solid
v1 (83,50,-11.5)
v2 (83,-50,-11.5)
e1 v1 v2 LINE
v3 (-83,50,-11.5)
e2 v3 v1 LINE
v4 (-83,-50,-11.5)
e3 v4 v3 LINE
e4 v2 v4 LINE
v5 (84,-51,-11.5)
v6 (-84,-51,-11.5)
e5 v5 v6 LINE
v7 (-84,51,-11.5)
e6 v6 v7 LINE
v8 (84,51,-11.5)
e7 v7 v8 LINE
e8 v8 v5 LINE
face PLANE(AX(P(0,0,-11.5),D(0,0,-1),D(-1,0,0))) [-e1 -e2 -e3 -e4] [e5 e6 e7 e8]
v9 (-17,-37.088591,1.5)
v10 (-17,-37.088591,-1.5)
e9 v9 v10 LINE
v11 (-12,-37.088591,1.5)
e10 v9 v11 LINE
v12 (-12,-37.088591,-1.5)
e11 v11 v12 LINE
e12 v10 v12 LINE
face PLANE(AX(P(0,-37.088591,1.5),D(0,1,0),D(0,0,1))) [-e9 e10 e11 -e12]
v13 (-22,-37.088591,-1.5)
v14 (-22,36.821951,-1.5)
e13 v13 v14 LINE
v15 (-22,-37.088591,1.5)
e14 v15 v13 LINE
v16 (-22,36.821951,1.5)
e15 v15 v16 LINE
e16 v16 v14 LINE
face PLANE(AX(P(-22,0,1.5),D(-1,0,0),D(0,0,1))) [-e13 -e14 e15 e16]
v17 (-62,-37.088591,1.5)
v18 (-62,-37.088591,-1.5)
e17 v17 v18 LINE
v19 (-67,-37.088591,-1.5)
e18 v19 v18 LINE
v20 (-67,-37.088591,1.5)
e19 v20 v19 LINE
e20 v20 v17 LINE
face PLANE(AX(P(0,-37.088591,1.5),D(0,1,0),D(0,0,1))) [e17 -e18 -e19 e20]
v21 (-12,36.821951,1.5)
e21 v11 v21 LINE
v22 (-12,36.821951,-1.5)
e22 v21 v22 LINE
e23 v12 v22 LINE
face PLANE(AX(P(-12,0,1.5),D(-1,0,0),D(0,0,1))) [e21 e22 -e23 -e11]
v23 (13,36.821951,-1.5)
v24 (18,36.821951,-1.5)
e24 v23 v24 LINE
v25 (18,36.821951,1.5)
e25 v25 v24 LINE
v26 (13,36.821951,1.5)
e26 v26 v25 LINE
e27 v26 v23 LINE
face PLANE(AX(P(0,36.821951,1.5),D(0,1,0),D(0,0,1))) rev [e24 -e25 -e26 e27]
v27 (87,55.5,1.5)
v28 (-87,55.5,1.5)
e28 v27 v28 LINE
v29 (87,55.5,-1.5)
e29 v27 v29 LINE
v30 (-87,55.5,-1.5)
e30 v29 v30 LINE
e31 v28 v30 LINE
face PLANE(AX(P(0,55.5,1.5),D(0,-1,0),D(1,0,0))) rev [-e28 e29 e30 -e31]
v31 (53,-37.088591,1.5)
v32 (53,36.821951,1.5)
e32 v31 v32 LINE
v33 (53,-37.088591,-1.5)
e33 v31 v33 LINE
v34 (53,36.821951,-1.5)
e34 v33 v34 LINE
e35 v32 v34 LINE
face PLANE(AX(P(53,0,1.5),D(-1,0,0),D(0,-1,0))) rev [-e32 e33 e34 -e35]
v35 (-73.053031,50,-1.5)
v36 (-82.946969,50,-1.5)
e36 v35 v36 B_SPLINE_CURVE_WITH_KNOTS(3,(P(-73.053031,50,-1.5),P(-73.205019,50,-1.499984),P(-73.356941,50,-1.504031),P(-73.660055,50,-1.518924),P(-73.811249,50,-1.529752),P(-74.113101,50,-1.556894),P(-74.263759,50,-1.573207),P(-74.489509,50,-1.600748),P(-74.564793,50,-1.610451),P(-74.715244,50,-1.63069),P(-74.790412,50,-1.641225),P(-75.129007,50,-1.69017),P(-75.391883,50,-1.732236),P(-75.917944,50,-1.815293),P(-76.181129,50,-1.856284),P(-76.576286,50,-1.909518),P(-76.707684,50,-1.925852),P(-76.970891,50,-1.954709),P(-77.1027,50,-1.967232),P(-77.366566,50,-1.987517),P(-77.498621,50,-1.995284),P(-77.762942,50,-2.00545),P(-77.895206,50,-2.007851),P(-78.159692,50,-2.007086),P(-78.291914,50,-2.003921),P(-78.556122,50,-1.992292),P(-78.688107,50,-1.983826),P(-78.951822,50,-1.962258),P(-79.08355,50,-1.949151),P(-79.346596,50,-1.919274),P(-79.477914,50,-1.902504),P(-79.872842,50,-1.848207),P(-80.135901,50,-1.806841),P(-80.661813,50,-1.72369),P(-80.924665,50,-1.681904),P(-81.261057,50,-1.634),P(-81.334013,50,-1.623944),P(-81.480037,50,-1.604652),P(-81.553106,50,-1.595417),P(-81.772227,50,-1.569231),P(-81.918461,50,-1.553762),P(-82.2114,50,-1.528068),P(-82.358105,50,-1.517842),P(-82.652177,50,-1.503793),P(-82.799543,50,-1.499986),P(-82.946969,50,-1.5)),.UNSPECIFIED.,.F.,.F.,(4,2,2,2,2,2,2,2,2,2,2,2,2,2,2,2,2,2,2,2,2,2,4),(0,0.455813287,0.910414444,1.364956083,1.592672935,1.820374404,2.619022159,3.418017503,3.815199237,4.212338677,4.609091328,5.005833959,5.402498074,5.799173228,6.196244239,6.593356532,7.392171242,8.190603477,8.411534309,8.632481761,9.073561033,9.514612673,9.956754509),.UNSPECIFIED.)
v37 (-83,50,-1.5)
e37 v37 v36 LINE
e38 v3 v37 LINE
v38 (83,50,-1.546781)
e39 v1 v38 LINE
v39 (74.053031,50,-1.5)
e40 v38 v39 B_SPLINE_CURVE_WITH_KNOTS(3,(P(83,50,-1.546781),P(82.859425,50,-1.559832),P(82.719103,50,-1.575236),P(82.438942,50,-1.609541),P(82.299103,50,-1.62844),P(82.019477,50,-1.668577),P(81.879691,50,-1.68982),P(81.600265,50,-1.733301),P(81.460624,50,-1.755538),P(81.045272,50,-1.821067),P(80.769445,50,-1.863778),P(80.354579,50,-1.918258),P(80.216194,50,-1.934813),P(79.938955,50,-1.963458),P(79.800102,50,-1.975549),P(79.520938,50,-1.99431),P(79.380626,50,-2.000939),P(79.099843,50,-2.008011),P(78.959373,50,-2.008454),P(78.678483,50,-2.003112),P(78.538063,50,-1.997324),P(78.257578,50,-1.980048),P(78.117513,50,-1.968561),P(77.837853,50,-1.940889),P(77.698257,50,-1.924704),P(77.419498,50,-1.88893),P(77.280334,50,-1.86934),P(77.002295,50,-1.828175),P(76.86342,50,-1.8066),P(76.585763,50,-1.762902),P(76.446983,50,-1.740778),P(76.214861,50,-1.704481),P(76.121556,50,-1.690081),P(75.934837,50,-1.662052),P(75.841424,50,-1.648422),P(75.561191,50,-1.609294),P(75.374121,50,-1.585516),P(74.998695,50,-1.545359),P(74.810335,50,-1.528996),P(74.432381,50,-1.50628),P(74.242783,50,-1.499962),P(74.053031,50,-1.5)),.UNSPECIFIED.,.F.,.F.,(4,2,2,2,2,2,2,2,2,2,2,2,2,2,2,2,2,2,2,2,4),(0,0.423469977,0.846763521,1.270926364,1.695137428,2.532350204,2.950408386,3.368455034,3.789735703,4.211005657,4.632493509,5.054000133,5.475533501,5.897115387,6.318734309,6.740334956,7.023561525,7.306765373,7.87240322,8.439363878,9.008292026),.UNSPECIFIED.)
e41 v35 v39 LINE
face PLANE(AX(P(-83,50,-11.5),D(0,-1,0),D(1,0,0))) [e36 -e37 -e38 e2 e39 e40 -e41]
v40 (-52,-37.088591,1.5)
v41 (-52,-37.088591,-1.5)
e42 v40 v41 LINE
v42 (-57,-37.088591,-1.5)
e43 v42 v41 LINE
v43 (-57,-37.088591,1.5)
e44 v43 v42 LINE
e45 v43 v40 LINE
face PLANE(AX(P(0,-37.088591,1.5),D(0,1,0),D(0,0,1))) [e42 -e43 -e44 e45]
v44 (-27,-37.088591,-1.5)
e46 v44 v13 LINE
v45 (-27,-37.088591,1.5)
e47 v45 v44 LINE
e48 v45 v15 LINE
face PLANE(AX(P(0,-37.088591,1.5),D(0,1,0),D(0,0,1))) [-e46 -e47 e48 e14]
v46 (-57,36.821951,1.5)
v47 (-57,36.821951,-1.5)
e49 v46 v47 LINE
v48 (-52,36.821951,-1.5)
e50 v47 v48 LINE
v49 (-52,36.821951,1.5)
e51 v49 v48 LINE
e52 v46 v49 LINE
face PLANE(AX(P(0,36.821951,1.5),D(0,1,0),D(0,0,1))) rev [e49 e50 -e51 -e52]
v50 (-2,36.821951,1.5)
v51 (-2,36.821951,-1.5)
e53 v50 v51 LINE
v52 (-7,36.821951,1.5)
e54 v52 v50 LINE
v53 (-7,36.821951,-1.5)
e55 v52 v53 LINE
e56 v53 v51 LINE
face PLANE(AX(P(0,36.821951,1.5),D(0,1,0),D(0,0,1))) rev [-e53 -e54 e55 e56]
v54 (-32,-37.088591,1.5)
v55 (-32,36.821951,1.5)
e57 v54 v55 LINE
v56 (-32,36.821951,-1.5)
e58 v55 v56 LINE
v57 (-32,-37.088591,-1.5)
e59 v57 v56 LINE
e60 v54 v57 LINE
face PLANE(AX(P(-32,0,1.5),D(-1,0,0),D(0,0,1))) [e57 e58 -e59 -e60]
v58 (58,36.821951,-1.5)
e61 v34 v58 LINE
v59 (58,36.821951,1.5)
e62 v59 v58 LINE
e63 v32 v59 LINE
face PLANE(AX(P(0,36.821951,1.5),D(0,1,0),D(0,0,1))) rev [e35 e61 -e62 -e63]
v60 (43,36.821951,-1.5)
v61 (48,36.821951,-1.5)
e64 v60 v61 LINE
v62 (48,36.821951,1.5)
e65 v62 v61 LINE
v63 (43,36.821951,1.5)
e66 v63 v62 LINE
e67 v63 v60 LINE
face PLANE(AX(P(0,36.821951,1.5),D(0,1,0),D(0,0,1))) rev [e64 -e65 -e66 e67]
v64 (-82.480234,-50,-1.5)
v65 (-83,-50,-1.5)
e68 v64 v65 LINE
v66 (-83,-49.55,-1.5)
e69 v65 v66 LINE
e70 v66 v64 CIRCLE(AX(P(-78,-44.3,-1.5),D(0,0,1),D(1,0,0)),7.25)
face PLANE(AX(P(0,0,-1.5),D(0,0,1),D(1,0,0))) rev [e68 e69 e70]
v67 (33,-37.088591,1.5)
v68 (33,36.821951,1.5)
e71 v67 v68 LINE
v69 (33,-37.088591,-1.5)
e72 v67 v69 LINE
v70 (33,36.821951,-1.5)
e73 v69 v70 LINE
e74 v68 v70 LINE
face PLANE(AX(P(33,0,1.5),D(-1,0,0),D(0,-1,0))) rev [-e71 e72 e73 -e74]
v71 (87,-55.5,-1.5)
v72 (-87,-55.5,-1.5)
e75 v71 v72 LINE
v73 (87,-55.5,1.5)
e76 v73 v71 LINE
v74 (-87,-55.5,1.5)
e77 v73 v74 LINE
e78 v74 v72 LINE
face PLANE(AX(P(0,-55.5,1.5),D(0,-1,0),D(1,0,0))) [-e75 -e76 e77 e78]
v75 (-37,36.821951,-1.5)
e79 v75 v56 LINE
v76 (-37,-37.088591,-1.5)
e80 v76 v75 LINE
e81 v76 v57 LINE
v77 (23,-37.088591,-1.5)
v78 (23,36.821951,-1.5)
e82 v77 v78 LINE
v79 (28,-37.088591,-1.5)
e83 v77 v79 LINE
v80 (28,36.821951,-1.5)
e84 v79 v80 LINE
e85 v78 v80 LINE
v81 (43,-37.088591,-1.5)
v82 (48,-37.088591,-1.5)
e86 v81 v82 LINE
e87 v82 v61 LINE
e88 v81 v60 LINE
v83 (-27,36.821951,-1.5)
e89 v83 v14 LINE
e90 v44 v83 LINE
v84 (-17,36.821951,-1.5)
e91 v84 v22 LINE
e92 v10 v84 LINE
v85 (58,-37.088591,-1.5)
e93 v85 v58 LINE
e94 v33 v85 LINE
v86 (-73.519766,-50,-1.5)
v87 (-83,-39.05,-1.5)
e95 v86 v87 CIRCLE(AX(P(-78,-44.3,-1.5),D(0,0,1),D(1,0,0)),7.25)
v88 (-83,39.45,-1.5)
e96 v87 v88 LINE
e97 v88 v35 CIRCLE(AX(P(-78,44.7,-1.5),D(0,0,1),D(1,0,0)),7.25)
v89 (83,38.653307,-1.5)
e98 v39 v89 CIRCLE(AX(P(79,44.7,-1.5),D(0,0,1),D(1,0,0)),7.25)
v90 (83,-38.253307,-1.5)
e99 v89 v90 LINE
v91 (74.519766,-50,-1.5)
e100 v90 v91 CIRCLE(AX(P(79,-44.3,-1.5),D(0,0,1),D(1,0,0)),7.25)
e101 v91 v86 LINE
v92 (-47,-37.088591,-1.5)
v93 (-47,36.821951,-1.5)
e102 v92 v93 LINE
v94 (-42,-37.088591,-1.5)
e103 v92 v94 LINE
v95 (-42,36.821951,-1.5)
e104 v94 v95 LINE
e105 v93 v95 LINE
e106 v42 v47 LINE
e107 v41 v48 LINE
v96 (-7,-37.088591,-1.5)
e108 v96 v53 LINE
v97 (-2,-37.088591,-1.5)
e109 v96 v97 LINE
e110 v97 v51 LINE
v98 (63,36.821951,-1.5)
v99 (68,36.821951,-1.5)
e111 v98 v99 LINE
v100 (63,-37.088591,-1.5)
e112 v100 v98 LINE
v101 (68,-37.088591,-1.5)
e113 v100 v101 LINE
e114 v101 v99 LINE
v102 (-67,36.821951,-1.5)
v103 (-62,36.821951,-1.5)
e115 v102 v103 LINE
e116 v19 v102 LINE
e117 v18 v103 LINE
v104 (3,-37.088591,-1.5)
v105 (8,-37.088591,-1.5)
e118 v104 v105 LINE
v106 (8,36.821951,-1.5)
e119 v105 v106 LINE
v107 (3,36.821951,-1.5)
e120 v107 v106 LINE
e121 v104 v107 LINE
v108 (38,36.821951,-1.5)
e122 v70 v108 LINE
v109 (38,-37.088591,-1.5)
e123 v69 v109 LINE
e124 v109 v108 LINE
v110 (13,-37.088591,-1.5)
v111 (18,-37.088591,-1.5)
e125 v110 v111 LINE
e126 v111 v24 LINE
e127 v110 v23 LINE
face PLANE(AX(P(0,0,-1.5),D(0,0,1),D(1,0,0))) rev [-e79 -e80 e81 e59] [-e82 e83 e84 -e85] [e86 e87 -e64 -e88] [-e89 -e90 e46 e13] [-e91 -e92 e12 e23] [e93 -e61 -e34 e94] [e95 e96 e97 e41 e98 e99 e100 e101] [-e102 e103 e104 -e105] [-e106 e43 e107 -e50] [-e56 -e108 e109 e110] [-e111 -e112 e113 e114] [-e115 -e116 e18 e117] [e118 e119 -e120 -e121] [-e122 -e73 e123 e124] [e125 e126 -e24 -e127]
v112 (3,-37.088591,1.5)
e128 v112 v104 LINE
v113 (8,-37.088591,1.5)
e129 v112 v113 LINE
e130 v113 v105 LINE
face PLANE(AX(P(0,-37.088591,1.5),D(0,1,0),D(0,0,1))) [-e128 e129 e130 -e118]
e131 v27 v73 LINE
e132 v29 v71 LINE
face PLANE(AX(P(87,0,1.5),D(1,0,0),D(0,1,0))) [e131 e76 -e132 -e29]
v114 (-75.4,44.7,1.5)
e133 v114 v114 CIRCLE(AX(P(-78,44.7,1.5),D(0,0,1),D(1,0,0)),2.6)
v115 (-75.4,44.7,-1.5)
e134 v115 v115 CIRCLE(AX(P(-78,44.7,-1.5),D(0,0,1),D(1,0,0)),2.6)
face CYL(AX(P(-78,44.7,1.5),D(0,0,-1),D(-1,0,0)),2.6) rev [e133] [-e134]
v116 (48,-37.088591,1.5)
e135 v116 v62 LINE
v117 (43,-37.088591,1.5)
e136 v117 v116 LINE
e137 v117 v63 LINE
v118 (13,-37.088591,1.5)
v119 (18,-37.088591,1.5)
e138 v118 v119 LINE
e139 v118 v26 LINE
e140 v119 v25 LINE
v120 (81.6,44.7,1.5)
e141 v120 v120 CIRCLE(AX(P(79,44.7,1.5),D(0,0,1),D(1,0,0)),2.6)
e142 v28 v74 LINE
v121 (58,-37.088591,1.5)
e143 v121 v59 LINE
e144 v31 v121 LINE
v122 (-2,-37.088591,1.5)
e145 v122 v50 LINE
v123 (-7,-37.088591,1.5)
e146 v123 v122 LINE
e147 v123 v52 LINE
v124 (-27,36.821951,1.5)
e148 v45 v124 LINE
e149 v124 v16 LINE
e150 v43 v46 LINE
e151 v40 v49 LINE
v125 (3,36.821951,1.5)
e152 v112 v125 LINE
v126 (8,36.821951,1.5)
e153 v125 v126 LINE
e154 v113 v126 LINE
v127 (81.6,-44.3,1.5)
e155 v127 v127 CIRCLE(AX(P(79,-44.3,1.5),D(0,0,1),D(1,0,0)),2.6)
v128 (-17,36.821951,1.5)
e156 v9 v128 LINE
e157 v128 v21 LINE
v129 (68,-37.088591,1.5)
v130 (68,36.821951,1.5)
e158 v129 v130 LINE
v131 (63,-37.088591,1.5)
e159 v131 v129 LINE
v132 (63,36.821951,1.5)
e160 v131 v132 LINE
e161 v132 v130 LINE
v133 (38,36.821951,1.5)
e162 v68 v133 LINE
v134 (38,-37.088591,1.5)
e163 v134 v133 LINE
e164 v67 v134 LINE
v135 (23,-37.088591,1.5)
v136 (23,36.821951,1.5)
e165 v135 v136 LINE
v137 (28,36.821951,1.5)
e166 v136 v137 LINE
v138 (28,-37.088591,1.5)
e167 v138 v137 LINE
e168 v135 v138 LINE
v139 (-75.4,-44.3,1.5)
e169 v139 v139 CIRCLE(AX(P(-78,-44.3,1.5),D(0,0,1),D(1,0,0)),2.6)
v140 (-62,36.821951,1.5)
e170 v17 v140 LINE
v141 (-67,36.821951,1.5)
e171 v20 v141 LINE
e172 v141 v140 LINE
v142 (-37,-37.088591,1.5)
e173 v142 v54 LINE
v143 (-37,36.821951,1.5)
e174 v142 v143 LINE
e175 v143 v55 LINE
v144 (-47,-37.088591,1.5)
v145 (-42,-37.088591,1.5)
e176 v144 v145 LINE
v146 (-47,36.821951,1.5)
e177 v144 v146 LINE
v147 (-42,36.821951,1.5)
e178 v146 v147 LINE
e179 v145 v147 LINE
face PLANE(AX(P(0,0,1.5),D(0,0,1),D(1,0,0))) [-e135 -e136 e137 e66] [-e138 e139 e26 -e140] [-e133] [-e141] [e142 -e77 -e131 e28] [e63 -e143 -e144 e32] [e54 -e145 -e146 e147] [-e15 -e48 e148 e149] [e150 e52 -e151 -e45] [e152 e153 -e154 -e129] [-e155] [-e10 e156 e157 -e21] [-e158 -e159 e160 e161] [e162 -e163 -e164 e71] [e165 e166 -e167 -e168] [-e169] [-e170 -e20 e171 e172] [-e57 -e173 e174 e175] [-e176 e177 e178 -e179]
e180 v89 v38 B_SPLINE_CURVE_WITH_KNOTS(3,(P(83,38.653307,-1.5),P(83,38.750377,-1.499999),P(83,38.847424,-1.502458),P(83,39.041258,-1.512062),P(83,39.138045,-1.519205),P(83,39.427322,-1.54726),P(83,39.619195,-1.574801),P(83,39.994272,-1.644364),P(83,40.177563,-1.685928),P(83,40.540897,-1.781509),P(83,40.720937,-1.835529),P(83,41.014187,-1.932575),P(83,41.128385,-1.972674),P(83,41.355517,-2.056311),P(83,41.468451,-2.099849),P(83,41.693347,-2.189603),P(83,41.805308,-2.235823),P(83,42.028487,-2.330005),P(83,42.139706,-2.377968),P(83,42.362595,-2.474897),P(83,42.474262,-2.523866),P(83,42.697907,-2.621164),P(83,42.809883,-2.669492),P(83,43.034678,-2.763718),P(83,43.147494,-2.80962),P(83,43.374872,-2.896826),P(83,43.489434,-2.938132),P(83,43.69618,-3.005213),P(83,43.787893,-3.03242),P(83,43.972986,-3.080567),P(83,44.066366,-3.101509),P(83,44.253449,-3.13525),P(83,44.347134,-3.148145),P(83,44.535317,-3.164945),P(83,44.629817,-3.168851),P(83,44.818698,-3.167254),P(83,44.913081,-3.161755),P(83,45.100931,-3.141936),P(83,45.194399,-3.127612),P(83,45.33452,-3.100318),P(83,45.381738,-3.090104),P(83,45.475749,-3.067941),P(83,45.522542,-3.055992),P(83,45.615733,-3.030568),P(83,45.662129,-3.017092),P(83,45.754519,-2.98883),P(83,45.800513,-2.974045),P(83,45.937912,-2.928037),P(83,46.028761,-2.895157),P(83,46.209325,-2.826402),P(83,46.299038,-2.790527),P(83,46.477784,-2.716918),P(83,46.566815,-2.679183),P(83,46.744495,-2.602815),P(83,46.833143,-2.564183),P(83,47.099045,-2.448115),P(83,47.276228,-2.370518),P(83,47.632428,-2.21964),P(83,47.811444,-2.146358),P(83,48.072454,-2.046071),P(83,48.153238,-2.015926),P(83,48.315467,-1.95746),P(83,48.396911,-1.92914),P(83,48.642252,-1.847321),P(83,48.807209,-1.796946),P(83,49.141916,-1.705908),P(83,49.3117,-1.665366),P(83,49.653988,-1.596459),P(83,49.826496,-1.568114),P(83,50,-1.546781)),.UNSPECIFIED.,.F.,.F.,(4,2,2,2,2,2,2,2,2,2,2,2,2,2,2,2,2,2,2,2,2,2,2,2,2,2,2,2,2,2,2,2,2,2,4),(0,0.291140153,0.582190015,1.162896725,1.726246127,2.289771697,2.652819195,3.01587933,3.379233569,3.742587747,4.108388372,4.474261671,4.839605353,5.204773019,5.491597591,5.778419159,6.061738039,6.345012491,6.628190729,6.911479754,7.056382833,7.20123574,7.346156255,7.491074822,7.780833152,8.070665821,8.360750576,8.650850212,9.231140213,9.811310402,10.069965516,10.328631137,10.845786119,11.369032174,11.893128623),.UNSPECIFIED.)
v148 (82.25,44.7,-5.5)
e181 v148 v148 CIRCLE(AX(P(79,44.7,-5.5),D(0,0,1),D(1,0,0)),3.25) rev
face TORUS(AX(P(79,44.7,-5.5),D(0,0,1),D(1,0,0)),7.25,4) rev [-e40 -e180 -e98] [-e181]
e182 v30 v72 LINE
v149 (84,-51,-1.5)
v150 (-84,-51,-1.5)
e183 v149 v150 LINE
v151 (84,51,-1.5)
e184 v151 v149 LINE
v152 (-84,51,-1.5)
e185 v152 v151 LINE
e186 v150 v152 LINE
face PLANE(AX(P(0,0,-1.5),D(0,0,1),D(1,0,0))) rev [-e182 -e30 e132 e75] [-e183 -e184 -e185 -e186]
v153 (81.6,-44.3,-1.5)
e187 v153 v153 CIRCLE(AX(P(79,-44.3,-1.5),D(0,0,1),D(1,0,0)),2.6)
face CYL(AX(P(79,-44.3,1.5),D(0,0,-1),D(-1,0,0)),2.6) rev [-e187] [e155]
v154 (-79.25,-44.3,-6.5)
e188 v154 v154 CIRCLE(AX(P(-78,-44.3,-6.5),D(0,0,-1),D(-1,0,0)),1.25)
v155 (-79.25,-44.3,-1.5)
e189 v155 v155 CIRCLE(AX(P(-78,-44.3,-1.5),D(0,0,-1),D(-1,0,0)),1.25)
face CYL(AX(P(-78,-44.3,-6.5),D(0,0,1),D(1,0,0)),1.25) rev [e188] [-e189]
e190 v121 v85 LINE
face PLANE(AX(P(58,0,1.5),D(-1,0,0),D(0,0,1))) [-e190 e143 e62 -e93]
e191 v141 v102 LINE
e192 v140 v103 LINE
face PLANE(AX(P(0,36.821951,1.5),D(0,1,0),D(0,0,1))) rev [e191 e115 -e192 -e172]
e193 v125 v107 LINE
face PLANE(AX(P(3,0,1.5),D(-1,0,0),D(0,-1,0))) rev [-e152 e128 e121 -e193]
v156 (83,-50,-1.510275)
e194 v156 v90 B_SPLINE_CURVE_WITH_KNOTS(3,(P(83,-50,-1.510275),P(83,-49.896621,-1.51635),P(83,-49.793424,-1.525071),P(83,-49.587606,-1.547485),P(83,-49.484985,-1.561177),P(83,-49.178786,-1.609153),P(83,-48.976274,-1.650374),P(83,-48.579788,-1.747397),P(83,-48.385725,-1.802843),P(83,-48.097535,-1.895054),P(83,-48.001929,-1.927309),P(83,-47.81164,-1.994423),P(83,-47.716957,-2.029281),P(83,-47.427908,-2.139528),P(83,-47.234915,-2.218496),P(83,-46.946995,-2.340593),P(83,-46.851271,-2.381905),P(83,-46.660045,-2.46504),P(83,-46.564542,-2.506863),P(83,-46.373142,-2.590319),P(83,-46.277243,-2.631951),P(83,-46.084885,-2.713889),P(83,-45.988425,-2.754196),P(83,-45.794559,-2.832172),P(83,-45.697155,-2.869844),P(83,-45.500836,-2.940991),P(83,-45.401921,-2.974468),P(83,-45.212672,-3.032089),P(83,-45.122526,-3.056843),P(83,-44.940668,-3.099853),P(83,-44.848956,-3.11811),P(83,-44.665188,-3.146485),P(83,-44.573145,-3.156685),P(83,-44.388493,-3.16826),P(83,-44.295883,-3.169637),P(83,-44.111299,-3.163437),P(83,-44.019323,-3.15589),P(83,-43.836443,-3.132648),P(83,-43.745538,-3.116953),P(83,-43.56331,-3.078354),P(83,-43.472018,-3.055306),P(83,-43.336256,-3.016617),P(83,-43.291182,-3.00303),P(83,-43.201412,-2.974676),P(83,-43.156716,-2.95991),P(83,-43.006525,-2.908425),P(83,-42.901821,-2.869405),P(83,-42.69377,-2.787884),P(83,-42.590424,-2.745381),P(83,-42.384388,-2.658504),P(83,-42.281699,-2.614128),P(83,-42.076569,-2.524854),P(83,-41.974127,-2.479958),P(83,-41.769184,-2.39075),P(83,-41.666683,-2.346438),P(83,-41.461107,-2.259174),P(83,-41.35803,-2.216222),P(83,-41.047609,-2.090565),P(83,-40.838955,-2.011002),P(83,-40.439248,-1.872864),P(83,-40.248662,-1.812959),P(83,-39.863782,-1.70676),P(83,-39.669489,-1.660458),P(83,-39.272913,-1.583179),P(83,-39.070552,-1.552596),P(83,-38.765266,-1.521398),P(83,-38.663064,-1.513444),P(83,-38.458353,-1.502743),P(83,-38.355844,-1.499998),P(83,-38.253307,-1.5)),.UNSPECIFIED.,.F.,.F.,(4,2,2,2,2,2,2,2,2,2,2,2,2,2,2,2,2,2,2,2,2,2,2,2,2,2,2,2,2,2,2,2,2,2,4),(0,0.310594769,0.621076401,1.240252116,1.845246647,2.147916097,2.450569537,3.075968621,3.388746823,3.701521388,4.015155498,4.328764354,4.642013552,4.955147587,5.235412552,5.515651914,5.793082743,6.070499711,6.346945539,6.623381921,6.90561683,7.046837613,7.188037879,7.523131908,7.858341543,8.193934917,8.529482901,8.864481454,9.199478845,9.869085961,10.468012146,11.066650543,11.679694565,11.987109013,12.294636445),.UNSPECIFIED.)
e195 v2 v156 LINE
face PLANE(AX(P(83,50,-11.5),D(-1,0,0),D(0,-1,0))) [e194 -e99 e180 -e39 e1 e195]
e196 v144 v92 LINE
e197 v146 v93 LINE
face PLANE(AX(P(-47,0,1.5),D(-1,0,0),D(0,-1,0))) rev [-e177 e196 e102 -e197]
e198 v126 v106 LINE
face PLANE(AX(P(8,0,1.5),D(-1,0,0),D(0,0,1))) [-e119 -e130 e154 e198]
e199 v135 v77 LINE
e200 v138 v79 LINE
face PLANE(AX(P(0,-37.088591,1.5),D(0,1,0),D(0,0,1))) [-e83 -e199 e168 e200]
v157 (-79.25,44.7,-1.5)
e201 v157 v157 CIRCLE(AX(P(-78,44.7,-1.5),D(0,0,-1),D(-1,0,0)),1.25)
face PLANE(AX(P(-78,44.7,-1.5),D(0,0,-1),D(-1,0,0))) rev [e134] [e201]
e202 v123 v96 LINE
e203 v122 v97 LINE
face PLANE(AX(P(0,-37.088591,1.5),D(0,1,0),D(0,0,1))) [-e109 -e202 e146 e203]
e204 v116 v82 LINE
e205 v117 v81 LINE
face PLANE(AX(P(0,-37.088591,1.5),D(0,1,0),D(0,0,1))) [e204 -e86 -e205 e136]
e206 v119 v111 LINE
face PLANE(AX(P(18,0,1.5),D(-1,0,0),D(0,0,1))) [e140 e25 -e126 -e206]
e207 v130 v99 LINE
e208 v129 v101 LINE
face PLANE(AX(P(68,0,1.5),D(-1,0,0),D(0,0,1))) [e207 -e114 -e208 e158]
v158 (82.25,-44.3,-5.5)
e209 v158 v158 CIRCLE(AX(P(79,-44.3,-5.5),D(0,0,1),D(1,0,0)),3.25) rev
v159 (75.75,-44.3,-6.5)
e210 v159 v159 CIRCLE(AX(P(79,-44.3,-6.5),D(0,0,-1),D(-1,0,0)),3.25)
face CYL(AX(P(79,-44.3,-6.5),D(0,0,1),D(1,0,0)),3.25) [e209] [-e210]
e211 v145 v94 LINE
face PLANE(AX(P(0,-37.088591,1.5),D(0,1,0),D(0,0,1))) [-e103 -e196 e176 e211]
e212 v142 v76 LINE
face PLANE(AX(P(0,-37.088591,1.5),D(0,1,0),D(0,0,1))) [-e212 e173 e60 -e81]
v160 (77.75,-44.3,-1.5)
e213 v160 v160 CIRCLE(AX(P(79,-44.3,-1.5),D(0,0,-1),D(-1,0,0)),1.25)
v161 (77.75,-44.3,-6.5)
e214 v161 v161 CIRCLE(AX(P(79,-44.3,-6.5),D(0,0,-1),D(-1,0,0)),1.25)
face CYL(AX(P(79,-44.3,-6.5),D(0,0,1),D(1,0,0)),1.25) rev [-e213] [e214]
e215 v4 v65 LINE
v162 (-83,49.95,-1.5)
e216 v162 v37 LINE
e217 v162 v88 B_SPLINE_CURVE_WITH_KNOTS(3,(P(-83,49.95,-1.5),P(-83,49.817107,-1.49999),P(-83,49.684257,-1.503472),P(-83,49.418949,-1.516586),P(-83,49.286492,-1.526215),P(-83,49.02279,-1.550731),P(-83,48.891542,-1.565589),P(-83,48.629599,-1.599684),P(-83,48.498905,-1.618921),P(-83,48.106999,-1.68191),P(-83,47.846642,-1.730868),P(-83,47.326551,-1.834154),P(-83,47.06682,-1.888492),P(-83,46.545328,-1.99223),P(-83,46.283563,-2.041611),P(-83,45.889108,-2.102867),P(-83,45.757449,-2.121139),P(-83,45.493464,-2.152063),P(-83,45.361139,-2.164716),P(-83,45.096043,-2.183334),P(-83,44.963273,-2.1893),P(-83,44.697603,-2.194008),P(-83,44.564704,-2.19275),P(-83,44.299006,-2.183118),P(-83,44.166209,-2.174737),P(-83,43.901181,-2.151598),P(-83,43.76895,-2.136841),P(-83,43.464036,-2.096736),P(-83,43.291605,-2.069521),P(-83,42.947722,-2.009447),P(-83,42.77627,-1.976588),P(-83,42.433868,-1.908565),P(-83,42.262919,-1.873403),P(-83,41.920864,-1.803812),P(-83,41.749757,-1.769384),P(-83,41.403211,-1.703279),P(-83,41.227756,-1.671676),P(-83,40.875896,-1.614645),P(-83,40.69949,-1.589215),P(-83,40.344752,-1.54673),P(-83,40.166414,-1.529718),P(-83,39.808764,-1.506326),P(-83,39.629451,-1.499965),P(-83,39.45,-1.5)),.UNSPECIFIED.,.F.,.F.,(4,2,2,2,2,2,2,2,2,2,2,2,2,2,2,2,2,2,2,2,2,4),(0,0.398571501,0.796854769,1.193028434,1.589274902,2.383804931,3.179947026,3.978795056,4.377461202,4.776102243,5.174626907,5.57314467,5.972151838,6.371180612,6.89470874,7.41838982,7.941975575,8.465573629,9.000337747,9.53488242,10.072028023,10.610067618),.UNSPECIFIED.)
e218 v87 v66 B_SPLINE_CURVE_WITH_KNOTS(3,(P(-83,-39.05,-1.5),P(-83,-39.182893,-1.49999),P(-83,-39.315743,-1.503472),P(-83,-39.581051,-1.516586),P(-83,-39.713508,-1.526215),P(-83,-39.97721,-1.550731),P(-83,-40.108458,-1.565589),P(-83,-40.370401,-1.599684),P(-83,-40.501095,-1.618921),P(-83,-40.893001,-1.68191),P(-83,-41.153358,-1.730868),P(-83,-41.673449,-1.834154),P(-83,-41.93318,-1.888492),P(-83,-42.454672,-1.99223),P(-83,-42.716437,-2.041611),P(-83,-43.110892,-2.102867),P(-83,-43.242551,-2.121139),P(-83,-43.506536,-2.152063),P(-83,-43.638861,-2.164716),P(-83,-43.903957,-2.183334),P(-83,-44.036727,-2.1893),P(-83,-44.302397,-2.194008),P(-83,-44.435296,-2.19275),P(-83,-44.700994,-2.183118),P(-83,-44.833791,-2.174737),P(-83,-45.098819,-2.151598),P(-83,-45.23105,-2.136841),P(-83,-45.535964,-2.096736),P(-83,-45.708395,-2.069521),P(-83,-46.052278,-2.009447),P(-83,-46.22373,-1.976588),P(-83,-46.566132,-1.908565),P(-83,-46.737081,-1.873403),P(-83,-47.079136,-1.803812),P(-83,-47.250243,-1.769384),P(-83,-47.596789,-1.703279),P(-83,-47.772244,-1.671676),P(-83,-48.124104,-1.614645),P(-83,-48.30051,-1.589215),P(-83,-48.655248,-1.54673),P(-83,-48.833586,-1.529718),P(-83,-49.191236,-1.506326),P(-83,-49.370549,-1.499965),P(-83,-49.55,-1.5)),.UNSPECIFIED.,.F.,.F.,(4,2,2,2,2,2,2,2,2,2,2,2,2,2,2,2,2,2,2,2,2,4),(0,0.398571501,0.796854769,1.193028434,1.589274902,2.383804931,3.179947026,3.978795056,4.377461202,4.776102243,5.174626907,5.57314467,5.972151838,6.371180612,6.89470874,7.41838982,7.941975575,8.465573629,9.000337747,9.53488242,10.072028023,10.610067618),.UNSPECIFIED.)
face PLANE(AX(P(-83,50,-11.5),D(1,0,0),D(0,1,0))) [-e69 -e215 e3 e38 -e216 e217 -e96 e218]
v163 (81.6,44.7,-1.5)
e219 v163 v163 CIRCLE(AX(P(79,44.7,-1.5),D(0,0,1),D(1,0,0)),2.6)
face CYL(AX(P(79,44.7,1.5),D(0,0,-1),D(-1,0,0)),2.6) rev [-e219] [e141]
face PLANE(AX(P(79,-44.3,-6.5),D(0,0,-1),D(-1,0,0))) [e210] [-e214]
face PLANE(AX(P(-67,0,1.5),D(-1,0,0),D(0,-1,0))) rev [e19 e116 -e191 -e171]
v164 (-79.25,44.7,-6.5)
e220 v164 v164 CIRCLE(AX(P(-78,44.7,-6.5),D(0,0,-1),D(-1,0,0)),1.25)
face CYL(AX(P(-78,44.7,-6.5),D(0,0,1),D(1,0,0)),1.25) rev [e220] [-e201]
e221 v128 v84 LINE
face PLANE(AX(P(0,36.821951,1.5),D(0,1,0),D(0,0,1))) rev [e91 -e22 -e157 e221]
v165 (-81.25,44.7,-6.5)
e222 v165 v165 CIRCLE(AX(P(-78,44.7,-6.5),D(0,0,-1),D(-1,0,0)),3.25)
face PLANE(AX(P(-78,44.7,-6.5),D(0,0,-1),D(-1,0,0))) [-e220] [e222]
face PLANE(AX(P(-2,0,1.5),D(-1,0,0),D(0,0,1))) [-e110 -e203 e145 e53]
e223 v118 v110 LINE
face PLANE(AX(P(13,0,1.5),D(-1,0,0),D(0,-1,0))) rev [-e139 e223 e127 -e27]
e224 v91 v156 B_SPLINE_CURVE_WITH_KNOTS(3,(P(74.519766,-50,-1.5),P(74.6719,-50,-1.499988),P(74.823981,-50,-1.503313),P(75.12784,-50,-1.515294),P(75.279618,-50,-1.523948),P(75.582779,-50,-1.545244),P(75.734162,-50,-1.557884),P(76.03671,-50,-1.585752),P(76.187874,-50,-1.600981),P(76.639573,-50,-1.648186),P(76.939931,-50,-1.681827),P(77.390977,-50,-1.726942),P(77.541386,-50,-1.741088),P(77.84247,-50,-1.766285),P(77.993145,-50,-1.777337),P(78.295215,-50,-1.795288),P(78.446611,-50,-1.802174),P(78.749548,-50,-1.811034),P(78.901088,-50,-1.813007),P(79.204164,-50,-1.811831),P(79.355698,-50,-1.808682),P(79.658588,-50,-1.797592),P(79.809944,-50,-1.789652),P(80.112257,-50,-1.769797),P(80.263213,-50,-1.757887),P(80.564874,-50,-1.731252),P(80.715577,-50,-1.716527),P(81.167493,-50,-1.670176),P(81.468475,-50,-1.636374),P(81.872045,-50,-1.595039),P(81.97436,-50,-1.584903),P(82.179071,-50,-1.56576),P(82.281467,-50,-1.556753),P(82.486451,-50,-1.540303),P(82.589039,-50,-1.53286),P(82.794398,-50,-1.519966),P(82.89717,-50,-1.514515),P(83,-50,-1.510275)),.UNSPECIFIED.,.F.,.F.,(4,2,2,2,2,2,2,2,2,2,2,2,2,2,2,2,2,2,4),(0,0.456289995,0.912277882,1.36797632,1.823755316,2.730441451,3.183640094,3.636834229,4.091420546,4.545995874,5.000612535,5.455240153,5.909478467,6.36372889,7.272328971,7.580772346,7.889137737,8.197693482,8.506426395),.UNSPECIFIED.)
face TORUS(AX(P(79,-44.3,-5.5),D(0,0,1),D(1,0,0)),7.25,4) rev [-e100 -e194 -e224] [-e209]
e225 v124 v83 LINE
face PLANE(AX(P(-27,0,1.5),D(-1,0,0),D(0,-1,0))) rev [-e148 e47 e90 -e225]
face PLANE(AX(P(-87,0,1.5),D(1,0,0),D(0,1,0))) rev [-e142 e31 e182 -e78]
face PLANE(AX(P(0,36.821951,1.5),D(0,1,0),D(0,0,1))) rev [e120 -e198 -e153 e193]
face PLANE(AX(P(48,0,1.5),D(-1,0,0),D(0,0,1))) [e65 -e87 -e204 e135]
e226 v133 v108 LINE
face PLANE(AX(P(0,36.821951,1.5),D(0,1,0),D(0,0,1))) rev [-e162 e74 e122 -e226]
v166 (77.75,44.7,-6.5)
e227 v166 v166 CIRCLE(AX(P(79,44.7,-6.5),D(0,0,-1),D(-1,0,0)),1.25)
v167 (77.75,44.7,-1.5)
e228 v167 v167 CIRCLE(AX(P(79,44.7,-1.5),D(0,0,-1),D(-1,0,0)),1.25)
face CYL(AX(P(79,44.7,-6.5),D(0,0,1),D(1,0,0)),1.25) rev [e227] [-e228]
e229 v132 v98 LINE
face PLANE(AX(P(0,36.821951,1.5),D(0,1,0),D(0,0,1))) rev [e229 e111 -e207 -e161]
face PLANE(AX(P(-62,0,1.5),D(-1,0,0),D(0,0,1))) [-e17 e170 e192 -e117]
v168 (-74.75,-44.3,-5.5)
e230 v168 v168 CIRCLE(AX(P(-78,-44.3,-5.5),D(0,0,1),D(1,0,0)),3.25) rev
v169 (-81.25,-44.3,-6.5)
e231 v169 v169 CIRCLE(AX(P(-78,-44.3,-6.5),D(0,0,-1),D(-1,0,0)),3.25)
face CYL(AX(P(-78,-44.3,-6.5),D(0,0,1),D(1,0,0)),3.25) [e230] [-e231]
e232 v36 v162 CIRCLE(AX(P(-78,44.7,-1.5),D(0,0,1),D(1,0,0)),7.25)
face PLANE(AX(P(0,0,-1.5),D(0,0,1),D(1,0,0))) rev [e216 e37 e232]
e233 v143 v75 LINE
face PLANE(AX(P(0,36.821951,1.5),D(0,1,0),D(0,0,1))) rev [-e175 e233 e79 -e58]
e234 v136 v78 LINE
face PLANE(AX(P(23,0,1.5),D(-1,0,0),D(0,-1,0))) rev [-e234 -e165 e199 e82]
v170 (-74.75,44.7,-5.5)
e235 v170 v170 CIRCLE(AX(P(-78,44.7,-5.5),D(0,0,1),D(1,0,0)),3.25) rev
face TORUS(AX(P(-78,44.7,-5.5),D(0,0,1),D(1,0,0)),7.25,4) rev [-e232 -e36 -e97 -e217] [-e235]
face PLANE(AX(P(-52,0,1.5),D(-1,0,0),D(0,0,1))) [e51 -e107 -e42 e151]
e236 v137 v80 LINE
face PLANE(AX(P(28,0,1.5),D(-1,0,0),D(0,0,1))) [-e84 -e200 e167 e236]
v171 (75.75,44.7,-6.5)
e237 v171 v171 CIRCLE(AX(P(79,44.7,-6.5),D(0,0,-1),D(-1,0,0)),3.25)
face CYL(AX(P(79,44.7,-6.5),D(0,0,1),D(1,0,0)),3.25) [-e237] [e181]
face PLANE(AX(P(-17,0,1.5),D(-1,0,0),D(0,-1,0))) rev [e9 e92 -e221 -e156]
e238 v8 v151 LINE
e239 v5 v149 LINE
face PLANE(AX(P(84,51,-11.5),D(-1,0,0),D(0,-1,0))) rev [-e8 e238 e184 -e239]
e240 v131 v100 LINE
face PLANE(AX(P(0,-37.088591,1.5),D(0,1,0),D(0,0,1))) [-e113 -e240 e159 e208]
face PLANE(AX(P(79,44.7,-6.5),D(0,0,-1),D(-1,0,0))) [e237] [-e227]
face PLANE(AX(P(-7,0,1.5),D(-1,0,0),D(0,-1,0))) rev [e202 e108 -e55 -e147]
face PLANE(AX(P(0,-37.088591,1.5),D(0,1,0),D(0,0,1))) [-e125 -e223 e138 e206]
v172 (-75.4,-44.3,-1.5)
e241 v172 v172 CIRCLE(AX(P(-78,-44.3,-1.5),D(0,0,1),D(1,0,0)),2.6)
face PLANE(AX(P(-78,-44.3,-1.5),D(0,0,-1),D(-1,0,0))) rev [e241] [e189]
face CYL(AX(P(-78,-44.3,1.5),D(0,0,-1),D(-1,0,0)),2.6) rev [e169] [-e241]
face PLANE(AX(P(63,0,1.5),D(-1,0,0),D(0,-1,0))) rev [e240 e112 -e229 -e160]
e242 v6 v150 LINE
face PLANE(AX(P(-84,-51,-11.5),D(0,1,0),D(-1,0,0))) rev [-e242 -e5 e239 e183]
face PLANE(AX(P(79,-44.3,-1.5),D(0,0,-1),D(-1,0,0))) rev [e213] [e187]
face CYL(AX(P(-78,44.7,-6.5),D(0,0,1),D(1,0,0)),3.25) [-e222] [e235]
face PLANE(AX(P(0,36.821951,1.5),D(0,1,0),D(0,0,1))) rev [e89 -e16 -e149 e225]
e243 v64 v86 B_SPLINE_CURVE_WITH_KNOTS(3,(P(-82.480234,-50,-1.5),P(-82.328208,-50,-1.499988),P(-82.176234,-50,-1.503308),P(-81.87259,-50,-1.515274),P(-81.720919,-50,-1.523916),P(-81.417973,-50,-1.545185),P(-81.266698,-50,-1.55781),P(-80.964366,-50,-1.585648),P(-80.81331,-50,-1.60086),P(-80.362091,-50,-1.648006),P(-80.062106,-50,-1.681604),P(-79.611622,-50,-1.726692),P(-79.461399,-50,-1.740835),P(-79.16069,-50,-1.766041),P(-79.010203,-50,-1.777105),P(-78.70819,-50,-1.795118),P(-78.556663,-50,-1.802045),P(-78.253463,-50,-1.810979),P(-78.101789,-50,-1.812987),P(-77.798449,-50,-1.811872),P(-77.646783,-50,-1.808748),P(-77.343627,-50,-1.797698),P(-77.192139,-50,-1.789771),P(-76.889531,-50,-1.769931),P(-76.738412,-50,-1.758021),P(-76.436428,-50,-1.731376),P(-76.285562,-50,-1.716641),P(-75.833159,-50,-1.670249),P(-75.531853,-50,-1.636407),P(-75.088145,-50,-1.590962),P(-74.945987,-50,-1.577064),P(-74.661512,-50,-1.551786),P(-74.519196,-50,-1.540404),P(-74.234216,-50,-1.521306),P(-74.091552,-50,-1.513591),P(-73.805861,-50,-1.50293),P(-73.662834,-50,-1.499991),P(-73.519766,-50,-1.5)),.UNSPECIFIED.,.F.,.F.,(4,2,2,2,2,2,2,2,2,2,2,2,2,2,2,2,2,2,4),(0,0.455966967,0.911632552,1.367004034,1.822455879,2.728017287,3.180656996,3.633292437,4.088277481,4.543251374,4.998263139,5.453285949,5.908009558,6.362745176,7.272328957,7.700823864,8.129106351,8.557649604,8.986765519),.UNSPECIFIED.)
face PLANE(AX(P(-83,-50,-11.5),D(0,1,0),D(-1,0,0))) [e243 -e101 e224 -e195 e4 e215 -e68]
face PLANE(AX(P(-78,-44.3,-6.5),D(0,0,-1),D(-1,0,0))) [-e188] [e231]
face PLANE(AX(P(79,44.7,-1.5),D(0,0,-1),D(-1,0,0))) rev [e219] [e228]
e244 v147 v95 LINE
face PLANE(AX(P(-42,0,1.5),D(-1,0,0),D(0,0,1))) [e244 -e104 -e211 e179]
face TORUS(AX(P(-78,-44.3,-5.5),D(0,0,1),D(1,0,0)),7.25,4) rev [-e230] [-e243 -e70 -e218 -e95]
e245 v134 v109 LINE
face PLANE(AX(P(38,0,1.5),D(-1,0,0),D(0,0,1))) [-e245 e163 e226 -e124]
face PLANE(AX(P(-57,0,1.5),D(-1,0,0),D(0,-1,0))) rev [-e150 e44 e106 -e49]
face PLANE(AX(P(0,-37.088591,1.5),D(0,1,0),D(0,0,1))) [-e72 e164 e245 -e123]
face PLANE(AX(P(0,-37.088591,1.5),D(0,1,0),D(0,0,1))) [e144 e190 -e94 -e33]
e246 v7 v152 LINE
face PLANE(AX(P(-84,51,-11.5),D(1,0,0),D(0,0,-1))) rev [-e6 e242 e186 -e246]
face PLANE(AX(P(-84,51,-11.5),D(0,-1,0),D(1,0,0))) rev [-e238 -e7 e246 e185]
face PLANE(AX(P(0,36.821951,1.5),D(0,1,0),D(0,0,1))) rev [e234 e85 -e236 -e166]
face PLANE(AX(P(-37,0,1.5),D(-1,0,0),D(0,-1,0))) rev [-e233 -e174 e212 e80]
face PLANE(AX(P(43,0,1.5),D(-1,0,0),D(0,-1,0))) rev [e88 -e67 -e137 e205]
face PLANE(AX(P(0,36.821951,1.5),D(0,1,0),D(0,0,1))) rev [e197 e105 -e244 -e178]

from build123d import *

# Parameters (mm, degrees)
SKETCH1_W           = 174
SKETCH1_H           = 111
SKETCH1_R           = 2.6
SKETCH1_W_2         = 5
SKETCH1_H_2         = 73.910542587
BOSS_EXTRUDE1_DEPTH = 1.5
SKETCH2_R           = 3.25
SKETCH2_R_2         = 1.25
BOSS_EXTRUDE2_DEPTH = 5
SKETCH3_W           = 168
SKETCH3_H           = 102
SKETCH3_W_2         = 166
SKETCH3_H_2         = 100
BOSS_EXTRUDE3_DEPTH = 10
FILLET1_R           = 4


with BuildPart() as part:
    # Sketch1 → Boss-Extrude1 (new, symmetric)
    with BuildSketch(Plane.XY):
        Rectangle(SKETCH1_W, SKETCH1_H)
        with Locations((-78, -44.3)):
            Circle(SKETCH1_R, mode=Mode.SUBTRACT)
        with Locations((-78, 44.7)):
            Circle(SKETCH1_R, mode=Mode.SUBTRACT)
        with Locations((79, 44.7)):
            Circle(SKETCH1_R, mode=Mode.SUBTRACT)
        with Locations((79, -44.3)):
            Circle(SKETCH1_R, mode=Mode.SUBTRACT)
        with Locations((-54.5, -0.133320073)):
            Rectangle(SKETCH1_W_2, SKETCH1_H_2, mode=Mode.SUBTRACT)
        with Locations((-64.5, -0.133320073)):
            Rectangle(SKETCH1_W_2, SKETCH1_H_2, mode=Mode.SUBTRACT)
        with Locations((-44.5, -0.133320073)):
            Rectangle(SKETCH1_W_2, SKETCH1_H_2, mode=Mode.SUBTRACT)
        with Locations((-34.5, -0.133320073)):
            Rectangle(SKETCH1_W_2, SKETCH1_H_2, mode=Mode.SUBTRACT)
        with Locations((-24.5, -0.133320073)):
            Rectangle(SKETCH1_W_2, SKETCH1_H_2, mode=Mode.SUBTRACT)
        with Locations((-14.5, -0.133320073)):
            Rectangle(SKETCH1_W_2, SKETCH1_H_2, mode=Mode.SUBTRACT)
        with Locations((-4.5, -0.133320073)):
            Rectangle(SKETCH1_W_2, SKETCH1_H_2, mode=Mode.SUBTRACT)
        with Locations((5.5, -0.133320073)):
            Rectangle(SKETCH1_W_2, SKETCH1_H_2, mode=Mode.SUBTRACT)
        with Locations((15.5, -0.133320073)):
            Rectangle(SKETCH1_W_2, SKETCH1_H_2, mode=Mode.SUBTRACT)
        with Locations((25.5, -0.133320073)):
            Rectangle(SKETCH1_W_2, SKETCH1_H_2, mode=Mode.SUBTRACT)
        with Locations((35.5, -0.133320073)):
            Rectangle(SKETCH1_W_2, SKETCH1_H_2, mode=Mode.SUBTRACT)
        with Locations((45.5, -0.133320073)):
            Rectangle(SKETCH1_W_2, SKETCH1_H_2, mode=Mode.SUBTRACT)
        with Locations((55.5, -0.133320073)):
            Rectangle(SKETCH1_W_2, SKETCH1_H_2, mode=Mode.SUBTRACT)
        with Locations((65.5, -0.133320073)):
            Rectangle(SKETCH1_W_2, SKETCH1_H_2, mode=Mode.SUBTRACT)
    extrude(amount=BOSS_EXTRUDE1_DEPTH, both=True)

    # Sketch2 → Boss-Extrude2 (add)
    # profile 1 of 4: a face of its own
    with BuildSketch(Plane(origin=(0, 0, -1.5), x_dir=(-1, 0, 0), z_dir=(0, 0, -1))):
        with Locations(Location((-79, 44.7, 0), (0, 0, 180))):
            Circle(SKETCH2_R)
        with Locations((-79, 44.7)):
            Circle(SKETCH2_R_2, mode=Mode.SUBTRACT)
    # profile 2 of 4: a face of its own
    with BuildSketch(Plane(origin=(0, 0, -1.5), x_dir=(-1, 0, 0), z_dir=(0, 0, -1))):
        with Locations(Location((-79, -44.3, 0), (0, 0, 180))):
            Circle(SKETCH2_R)
        with Locations((-79, -44.3)):
            Circle(SKETCH2_R_2, mode=Mode.SUBTRACT)
    # profile 3 of 4: a face of its own
    with BuildSketch(Plane(origin=(0, 0, -1.5), x_dir=(-1, 0, 0), z_dir=(0, 0, -1))):
        with Locations(Location((78, 44.7, 0), (0, 0, 180))):
            Circle(SKETCH2_R)
        with Locations((78, 44.7)):
            Circle(SKETCH2_R_2, mode=Mode.SUBTRACT)
    # profile 4 of 4: a face of its own
    with BuildSketch(Plane(origin=(0, 0, -1.5), x_dir=(-1, 0, 0), z_dir=(0, 0, -1))):
        with Locations(Location((78, -44.3, 0), (0, 0, 180))):
            Circle(SKETCH2_R)
        with Locations((78, -44.3)):
            Circle(SKETCH2_R_2, mode=Mode.SUBTRACT)
    extrude(amount=BOSS_EXTRUDE2_DEPTH)

    # Sketch3 → Boss-Extrude3 (add)
    with BuildSketch(Plane(origin=(0, 0, -1.5), x_dir=(-1, 0, 0), z_dir=(0, 0, -1))):
        Rectangle(SKETCH3_W, SKETCH3_H)
        Rectangle(SKETCH3_W_2, SKETCH3_H_2, mode=Mode.SUBTRACT)
    extrude(amount=BOSS_EXTRUDE3_DEPTH)

    # Fillet1
    # the kernel refuses this fillet: 4 mm, written as the material it adds along each edge
    with BuildSketch(Plane(origin=(79, 44.7, -1.5), x_dir=(1, 0, 0), z_dir=(0, 1, 0))) as fillet1_piece_1_section:
        with BuildLine():
            CenterArc((3.25 + FILLET1_R, FILLET1_R), FILLET1_R, 180, 90)
            Line((3.25, FILLET1_R), (3.25, 0))
            Line((3.25, 0), (3.25 + FILLET1_R, 0))
        make_face()
    fillet1_piece_1 = revolve(axis=Axis((79, 44.7, -1.5), (0, 0, -1)), mode=Mode.PRIVATE)
    fillet1_piece_1 = split(fillet1_piece_1, bisect_by=Plane(origin=(74.608842471, 50, -2.641157529), z_dir=(0, -1, 0)), keep=Keep.TOP, mode=Mode.PRIVATE)
    fillet1_piece_1 = split(fillet1_piece_1, bisect_by=Plane(origin=(83, 44.7, -2.641157529), z_dir=(-1, 0, 0)), keep=Keep.TOP, mode=Mode.PRIVATE)
    add(fillet1_piece_1)
    with BuildSketch(Plane(origin=(79, -44.3, -1.5), x_dir=(1, 0, 0), z_dir=(0, 1, 0))) as fillet1_piece_2_section:
        with BuildLine():
            CenterArc((3.25 + FILLET1_R, FILLET1_R), FILLET1_R, 180, 90)
            Line((3.25, FILLET1_R), (3.25, 0))
            Line((3.25, 0), (3.25 + FILLET1_R, 0))
        make_face()
    fillet1_piece_2 = revolve(axis=Axis((79, -44.3, -1.5), (0, 0, -1)), mode=Mode.PRIVATE)
    fillet1_piece_2 = split(fillet1_piece_2, bisect_by=Plane(origin=(83, -44.3, -2.641059385), z_dir=(-1, 0, 0)), keep=Keep.TOP, mode=Mode.PRIVATE)
    fillet1_piece_2 = split(fillet1_piece_2, bisect_by=Plane(origin=(74.608940615, -50, -2.641059385), z_dir=(0, 1, 0)), keep=Keep.TOP, mode=Mode.PRIVATE)
    add(fillet1_piece_2)
    with BuildSketch(Plane(origin=(-78, 44.7, -1.5), x_dir=(1, 0, 0), z_dir=(0, 1, 0))) as fillet1_piece_3_section:
        with BuildLine():
            CenterArc((3.25 + FILLET1_R, FILLET1_R), FILLET1_R, 180, 90)
            Line((3.25, FILLET1_R), (3.25, 0))
            Line((3.25, 0), (3.25 + FILLET1_R, 0))
        make_face()
    fillet1_piece_3 = revolve(axis=Axis((-78, 44.7, -1.5), (0, 0, -1)), mode=Mode.PRIVATE)
    fillet1_piece_3 = split(fillet1_piece_3, bisect_by=Plane(origin=(-82.390403008, 50, -2.640403008), z_dir=(0, -1, 0)), keep=Keep.TOP, mode=Mode.PRIVATE)
    fillet1_piece_3 = split(fillet1_piece_3, bisect_by=Plane(origin=(-83, 44.7, -2.640403008), z_dir=(1, 0, 0)), keep=Keep.TOP, mode=Mode.PRIVATE)
    add(fillet1_piece_3)
    with BuildSketch(Plane(origin=(-78, -44.3, -1.5), x_dir=(1, 0, 0), z_dir=(0, 1, 0))) as fillet1_piece_4_section:
        with BuildLine():
            CenterArc((3.25 + FILLET1_R, FILLET1_R), FILLET1_R, 180, 90)
            Line((3.25, FILLET1_R), (3.25, 0))
            Line((3.25, 0), (3.25 + FILLET1_R, 0))
        make_face()
    fillet1_piece_4 = revolve(axis=Axis((-78, -44.3, -1.5), (0, 0, -1)), mode=Mode.PRIVATE)
    fillet1_piece_4 = split(fillet1_piece_4, bisect_by=Plane(origin=(-82.390309195, -50, -2.640309195), z_dir=(0, 1, 0)), keep=Keep.TOP, mode=Mode.PRIVATE)
    fillet1_piece_4 = split(fillet1_piece_4, bisect_by=Plane(origin=(-83, -44.3, -2.640309195), z_dir=(1, 0, 0)), keep=Keep.TOP, mode=Mode.PRIVATE)
    add(fillet1_piece_4)


solid = part.part
